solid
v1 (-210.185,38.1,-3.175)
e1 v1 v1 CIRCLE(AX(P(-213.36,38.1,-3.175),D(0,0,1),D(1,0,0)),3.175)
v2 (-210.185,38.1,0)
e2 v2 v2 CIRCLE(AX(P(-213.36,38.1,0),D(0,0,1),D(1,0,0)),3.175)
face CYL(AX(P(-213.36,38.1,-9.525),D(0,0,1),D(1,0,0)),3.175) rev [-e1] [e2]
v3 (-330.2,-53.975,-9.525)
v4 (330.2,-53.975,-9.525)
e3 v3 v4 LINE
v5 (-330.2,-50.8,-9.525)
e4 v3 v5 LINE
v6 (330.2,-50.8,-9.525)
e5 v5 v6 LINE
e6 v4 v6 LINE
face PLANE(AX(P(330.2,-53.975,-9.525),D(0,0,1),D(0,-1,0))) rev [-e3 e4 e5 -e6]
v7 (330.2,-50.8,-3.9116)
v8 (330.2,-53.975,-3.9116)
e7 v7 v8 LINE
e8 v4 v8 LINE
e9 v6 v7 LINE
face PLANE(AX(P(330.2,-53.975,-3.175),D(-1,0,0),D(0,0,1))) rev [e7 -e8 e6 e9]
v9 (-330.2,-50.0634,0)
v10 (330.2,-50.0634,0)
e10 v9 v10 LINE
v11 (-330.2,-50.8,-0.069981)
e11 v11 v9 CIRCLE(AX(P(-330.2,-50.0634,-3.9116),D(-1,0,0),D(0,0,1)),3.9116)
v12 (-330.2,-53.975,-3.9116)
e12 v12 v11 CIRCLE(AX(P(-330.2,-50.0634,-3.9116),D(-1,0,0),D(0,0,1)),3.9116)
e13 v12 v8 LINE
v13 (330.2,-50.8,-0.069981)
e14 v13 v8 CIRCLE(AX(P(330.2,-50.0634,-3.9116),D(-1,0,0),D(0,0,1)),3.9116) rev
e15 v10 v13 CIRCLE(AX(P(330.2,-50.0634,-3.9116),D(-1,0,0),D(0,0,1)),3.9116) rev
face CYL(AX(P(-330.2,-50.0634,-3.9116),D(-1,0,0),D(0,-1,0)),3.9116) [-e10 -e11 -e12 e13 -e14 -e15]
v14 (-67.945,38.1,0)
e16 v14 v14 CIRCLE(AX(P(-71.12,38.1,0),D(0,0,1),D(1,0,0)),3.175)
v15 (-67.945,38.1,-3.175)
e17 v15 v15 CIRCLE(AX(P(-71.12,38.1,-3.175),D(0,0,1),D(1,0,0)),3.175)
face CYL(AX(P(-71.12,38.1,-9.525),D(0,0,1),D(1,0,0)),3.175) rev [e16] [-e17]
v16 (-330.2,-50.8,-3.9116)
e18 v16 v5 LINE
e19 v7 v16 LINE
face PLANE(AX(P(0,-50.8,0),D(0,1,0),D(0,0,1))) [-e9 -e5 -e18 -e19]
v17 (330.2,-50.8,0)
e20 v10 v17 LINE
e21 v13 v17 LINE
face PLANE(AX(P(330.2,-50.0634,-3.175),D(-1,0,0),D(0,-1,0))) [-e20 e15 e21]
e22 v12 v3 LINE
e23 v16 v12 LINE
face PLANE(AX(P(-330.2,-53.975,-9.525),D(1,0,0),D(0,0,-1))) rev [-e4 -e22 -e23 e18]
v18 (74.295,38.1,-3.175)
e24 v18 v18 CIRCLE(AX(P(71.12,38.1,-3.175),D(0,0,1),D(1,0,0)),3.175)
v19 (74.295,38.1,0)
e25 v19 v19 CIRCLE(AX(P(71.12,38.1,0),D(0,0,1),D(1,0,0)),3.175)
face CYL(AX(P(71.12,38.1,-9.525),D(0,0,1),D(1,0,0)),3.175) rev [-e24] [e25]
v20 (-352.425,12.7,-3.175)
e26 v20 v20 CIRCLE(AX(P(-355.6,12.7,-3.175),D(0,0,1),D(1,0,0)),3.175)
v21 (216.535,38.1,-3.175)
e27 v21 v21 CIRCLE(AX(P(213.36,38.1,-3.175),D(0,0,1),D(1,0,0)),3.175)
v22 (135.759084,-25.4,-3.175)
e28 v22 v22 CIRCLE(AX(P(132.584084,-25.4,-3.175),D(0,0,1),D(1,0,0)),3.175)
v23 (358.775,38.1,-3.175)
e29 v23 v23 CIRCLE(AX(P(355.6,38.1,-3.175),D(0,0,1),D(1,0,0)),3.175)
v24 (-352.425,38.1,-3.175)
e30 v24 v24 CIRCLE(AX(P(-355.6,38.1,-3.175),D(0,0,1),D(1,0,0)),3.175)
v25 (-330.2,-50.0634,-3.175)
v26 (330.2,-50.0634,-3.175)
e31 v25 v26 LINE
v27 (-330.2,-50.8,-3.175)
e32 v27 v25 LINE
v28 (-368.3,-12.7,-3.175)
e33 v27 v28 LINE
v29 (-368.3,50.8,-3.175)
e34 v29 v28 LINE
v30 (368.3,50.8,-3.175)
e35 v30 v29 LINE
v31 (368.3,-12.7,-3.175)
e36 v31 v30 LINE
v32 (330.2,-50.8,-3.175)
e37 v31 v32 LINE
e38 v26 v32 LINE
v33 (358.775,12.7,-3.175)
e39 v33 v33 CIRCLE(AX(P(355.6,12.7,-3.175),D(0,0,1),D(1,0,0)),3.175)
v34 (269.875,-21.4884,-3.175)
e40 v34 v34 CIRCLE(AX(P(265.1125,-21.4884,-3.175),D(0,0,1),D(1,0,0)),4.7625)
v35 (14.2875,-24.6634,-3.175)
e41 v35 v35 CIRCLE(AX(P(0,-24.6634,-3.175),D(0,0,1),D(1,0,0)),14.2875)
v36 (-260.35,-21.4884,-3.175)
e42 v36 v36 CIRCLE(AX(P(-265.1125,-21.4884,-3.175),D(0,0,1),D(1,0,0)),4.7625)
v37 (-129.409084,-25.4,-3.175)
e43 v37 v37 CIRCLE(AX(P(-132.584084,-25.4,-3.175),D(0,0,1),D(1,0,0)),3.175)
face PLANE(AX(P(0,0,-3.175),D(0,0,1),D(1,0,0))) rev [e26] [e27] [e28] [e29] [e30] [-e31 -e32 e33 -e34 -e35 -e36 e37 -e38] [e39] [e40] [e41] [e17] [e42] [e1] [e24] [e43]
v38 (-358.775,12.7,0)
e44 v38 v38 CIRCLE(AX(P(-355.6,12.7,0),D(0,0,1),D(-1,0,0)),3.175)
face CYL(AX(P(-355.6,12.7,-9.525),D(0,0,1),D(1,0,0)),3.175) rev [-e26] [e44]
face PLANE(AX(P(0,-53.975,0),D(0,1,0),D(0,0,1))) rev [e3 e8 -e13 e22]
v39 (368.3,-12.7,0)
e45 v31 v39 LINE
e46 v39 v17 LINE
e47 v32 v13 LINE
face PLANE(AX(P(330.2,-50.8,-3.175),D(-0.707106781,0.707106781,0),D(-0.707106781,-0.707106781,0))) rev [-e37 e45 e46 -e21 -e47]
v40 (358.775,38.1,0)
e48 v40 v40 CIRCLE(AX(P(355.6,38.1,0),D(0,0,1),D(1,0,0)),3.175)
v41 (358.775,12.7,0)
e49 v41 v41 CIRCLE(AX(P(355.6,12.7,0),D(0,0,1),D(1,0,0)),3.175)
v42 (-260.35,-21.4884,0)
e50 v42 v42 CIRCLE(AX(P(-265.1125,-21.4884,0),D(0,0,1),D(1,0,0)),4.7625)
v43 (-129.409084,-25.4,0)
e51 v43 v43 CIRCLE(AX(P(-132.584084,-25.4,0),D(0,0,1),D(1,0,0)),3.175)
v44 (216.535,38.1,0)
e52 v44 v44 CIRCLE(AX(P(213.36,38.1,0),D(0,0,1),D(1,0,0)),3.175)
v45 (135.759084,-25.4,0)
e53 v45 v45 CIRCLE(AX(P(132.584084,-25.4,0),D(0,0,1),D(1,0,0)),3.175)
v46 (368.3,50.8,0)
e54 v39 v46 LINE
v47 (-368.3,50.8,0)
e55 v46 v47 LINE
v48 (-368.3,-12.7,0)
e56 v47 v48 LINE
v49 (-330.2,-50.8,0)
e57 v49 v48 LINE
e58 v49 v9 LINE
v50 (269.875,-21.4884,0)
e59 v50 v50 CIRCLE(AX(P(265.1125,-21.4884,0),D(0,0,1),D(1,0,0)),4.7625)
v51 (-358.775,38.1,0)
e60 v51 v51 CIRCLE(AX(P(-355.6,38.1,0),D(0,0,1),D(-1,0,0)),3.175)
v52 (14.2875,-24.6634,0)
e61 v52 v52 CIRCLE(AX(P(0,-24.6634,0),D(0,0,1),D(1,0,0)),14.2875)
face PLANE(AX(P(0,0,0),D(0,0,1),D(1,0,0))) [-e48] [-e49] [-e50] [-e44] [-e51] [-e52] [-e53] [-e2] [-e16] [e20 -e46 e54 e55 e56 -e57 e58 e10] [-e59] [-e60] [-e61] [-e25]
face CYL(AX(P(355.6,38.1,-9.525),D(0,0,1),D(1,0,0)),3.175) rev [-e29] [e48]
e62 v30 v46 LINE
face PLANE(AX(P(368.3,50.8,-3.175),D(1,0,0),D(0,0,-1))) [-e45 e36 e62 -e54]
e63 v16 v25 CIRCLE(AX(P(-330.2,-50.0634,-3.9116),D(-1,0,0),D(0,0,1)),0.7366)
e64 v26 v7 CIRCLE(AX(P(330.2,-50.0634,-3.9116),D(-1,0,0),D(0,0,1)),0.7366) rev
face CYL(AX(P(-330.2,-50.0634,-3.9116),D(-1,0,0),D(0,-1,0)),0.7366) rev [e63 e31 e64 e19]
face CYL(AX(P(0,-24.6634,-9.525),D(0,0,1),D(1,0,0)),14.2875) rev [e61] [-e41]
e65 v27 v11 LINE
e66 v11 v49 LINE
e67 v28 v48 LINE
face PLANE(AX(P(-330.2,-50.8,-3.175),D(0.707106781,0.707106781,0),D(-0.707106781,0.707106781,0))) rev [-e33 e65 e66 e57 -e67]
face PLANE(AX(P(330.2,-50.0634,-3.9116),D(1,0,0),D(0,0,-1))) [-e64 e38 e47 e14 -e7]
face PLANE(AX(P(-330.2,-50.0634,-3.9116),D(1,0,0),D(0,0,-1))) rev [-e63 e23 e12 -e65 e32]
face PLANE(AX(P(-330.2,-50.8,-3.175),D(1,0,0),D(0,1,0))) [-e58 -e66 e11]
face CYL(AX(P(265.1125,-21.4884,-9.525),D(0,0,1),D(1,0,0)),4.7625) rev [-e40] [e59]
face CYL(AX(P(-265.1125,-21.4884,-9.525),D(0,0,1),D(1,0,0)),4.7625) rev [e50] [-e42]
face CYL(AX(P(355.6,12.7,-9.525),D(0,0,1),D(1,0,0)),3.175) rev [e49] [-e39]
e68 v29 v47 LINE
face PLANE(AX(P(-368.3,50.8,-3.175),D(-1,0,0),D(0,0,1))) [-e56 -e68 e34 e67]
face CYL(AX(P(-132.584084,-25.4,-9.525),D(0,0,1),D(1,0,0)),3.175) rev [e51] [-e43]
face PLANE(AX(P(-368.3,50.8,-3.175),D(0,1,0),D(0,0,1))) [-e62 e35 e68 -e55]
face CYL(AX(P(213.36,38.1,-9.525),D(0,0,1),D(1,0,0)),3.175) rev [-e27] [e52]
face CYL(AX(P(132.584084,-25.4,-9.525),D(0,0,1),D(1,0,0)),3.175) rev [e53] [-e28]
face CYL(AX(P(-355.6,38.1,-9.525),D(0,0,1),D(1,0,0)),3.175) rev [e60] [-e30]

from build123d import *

# Parameters (mm, degrees)
SKETCH1_W                    = 736.6
SKETCH1_H                    = 101.6
BASE_FLANGE1_DEPTH           = 3.175
CUT_EXTRUDE2_DEPTH           = 3.175
EDGE_FLANGE1_STRIP_W         = 14.1732
EDGE_FLANGE1_STRIP_H         = 3.175
EDGE_FLANGE1_STRIP_CUT_DEPTH = 660.4
EDGE_FLANGE1_DEPTH           = 660.4
SKETCH12_R                   = 14.2875
SKETCH12_R_2                 = 4.7625
CUT_EXTRUDE3_DEPTH           = 373.35589998
SKETCH13_R                   = 3.175
CUT_EXTRUDE4_DEPTH           = 373.35589998


# Sheet-metal steps are written as plain solids
with BuildPart() as part:
    # Sketch1 → Base-Flange1 (new body)
    with BuildSketch(Plane.XY):
        Rectangle(SKETCH1_W, SKETCH1_H)
    extrude(amount=-BASE_FLANGE1_DEPTH)

    # Sketch11 → Cut-Extrude2 (cut)
    with BuildSketch(Plane.XY):
        Polygon((-368.3, -50.8), (-330.2, -50.8), (-368.3, -12.7), align=None)
        Polygon((368.3, -50.8), (330.2, -50.8), (368.3, -12.7), align=None)
    extrude(amount=-CUT_EXTRUDE2_DEPTH, mode=Mode.SUBTRACT)

    # Edge-Flange1 strip (across the edge) → Edge-Flange1 strip cut (cut)
    with BuildSketch(Plane(origin=(330.2, -50.8, -3.175), x_dir=(0, 1, 0), z_dir=(-1, 0, 0))):
        with Locations((-6.35, -1.5875)):
            Rectangle(EDGE_FLANGE1_STRIP_W, EDGE_FLANGE1_STRIP_H)
    extrude(amount=EDGE_FLANGE1_STRIP_CUT_DEPTH, mode=Mode.SUBTRACT)

    # Edge-Flange1 section (across the edge) → Edge-Flange1 (add)
    with BuildSketch(Plane(origin=(330.2, -50.8, -3.175), x_dir=(0, 1, 0), z_dir=(-1, 0, 0))):
        with BuildLine():
            Line((-3.175, 0.7366), (-3.175, 6.35))
            Line((-3.175, 6.35), (0, 6.35))
            Line((0, 6.35), (0, 0.7366))
            ThreePointArc((0, 0.7366), (0.215745145, 0.215745145), (0.7366, 0))
            Line((0.7366, 0), (0.7366, -3.175))
            ThreePointArc((0.7366, -3.175), (-2.029318885, -2.029318885), (-3.175, 0.7366))
        make_face()
    extrude(amount=EDGE_FLANGE1_DEPTH)

    # Sketch12 → Cut-Extrude3 (cut, through all)
    with BuildSketch(Plane.XY):
        with Locations((0, -24.6634)):
            Circle(SKETCH12_R)
        with Locations((-265.1125, -21.4884)):
            Circle(SKETCH12_R_2)
        with Locations((265.1125, -21.4884)):
            Circle(SKETCH12_R_2)
    extrude(amount=-CUT_EXTRUDE3_DEPTH, mode=Mode.SUBTRACT)

    # Sketch13 → Cut-Extrude4 (cut, through all)
    with BuildSketch(Plane.XY):
        with Locations((355.6, 38.1)):
            Circle(SKETCH13_R)
        with Locations((355.6, 12.7)):
            Circle(SKETCH13_R)
        with Locations((-355.6, 12.7)):
            Circle(SKETCH13_R)
        with Locations((-355.6, 38.1)):
            Circle(SKETCH13_R)
        with Locations((-213.36, 38.1)):
            Circle(SKETCH13_R)
        with Locations((-71.12, 38.1)):
            Circle(SKETCH13_R)
        with Locations((71.12, 38.1)):
            Circle(SKETCH13_R)
        with Locations((213.36, 38.1)):
            Circle(SKETCH13_R)
        with Locations((-132.584083533, -25.4)):
            Circle(SKETCH13_R)
        with Locations((132.584083533, -25.4)):
            Circle(SKETCH13_R)
    extrude(amount=-CUT_EXTRUDE4_DEPTH, mode=Mode.SUBTRACT)


solid = part.part
